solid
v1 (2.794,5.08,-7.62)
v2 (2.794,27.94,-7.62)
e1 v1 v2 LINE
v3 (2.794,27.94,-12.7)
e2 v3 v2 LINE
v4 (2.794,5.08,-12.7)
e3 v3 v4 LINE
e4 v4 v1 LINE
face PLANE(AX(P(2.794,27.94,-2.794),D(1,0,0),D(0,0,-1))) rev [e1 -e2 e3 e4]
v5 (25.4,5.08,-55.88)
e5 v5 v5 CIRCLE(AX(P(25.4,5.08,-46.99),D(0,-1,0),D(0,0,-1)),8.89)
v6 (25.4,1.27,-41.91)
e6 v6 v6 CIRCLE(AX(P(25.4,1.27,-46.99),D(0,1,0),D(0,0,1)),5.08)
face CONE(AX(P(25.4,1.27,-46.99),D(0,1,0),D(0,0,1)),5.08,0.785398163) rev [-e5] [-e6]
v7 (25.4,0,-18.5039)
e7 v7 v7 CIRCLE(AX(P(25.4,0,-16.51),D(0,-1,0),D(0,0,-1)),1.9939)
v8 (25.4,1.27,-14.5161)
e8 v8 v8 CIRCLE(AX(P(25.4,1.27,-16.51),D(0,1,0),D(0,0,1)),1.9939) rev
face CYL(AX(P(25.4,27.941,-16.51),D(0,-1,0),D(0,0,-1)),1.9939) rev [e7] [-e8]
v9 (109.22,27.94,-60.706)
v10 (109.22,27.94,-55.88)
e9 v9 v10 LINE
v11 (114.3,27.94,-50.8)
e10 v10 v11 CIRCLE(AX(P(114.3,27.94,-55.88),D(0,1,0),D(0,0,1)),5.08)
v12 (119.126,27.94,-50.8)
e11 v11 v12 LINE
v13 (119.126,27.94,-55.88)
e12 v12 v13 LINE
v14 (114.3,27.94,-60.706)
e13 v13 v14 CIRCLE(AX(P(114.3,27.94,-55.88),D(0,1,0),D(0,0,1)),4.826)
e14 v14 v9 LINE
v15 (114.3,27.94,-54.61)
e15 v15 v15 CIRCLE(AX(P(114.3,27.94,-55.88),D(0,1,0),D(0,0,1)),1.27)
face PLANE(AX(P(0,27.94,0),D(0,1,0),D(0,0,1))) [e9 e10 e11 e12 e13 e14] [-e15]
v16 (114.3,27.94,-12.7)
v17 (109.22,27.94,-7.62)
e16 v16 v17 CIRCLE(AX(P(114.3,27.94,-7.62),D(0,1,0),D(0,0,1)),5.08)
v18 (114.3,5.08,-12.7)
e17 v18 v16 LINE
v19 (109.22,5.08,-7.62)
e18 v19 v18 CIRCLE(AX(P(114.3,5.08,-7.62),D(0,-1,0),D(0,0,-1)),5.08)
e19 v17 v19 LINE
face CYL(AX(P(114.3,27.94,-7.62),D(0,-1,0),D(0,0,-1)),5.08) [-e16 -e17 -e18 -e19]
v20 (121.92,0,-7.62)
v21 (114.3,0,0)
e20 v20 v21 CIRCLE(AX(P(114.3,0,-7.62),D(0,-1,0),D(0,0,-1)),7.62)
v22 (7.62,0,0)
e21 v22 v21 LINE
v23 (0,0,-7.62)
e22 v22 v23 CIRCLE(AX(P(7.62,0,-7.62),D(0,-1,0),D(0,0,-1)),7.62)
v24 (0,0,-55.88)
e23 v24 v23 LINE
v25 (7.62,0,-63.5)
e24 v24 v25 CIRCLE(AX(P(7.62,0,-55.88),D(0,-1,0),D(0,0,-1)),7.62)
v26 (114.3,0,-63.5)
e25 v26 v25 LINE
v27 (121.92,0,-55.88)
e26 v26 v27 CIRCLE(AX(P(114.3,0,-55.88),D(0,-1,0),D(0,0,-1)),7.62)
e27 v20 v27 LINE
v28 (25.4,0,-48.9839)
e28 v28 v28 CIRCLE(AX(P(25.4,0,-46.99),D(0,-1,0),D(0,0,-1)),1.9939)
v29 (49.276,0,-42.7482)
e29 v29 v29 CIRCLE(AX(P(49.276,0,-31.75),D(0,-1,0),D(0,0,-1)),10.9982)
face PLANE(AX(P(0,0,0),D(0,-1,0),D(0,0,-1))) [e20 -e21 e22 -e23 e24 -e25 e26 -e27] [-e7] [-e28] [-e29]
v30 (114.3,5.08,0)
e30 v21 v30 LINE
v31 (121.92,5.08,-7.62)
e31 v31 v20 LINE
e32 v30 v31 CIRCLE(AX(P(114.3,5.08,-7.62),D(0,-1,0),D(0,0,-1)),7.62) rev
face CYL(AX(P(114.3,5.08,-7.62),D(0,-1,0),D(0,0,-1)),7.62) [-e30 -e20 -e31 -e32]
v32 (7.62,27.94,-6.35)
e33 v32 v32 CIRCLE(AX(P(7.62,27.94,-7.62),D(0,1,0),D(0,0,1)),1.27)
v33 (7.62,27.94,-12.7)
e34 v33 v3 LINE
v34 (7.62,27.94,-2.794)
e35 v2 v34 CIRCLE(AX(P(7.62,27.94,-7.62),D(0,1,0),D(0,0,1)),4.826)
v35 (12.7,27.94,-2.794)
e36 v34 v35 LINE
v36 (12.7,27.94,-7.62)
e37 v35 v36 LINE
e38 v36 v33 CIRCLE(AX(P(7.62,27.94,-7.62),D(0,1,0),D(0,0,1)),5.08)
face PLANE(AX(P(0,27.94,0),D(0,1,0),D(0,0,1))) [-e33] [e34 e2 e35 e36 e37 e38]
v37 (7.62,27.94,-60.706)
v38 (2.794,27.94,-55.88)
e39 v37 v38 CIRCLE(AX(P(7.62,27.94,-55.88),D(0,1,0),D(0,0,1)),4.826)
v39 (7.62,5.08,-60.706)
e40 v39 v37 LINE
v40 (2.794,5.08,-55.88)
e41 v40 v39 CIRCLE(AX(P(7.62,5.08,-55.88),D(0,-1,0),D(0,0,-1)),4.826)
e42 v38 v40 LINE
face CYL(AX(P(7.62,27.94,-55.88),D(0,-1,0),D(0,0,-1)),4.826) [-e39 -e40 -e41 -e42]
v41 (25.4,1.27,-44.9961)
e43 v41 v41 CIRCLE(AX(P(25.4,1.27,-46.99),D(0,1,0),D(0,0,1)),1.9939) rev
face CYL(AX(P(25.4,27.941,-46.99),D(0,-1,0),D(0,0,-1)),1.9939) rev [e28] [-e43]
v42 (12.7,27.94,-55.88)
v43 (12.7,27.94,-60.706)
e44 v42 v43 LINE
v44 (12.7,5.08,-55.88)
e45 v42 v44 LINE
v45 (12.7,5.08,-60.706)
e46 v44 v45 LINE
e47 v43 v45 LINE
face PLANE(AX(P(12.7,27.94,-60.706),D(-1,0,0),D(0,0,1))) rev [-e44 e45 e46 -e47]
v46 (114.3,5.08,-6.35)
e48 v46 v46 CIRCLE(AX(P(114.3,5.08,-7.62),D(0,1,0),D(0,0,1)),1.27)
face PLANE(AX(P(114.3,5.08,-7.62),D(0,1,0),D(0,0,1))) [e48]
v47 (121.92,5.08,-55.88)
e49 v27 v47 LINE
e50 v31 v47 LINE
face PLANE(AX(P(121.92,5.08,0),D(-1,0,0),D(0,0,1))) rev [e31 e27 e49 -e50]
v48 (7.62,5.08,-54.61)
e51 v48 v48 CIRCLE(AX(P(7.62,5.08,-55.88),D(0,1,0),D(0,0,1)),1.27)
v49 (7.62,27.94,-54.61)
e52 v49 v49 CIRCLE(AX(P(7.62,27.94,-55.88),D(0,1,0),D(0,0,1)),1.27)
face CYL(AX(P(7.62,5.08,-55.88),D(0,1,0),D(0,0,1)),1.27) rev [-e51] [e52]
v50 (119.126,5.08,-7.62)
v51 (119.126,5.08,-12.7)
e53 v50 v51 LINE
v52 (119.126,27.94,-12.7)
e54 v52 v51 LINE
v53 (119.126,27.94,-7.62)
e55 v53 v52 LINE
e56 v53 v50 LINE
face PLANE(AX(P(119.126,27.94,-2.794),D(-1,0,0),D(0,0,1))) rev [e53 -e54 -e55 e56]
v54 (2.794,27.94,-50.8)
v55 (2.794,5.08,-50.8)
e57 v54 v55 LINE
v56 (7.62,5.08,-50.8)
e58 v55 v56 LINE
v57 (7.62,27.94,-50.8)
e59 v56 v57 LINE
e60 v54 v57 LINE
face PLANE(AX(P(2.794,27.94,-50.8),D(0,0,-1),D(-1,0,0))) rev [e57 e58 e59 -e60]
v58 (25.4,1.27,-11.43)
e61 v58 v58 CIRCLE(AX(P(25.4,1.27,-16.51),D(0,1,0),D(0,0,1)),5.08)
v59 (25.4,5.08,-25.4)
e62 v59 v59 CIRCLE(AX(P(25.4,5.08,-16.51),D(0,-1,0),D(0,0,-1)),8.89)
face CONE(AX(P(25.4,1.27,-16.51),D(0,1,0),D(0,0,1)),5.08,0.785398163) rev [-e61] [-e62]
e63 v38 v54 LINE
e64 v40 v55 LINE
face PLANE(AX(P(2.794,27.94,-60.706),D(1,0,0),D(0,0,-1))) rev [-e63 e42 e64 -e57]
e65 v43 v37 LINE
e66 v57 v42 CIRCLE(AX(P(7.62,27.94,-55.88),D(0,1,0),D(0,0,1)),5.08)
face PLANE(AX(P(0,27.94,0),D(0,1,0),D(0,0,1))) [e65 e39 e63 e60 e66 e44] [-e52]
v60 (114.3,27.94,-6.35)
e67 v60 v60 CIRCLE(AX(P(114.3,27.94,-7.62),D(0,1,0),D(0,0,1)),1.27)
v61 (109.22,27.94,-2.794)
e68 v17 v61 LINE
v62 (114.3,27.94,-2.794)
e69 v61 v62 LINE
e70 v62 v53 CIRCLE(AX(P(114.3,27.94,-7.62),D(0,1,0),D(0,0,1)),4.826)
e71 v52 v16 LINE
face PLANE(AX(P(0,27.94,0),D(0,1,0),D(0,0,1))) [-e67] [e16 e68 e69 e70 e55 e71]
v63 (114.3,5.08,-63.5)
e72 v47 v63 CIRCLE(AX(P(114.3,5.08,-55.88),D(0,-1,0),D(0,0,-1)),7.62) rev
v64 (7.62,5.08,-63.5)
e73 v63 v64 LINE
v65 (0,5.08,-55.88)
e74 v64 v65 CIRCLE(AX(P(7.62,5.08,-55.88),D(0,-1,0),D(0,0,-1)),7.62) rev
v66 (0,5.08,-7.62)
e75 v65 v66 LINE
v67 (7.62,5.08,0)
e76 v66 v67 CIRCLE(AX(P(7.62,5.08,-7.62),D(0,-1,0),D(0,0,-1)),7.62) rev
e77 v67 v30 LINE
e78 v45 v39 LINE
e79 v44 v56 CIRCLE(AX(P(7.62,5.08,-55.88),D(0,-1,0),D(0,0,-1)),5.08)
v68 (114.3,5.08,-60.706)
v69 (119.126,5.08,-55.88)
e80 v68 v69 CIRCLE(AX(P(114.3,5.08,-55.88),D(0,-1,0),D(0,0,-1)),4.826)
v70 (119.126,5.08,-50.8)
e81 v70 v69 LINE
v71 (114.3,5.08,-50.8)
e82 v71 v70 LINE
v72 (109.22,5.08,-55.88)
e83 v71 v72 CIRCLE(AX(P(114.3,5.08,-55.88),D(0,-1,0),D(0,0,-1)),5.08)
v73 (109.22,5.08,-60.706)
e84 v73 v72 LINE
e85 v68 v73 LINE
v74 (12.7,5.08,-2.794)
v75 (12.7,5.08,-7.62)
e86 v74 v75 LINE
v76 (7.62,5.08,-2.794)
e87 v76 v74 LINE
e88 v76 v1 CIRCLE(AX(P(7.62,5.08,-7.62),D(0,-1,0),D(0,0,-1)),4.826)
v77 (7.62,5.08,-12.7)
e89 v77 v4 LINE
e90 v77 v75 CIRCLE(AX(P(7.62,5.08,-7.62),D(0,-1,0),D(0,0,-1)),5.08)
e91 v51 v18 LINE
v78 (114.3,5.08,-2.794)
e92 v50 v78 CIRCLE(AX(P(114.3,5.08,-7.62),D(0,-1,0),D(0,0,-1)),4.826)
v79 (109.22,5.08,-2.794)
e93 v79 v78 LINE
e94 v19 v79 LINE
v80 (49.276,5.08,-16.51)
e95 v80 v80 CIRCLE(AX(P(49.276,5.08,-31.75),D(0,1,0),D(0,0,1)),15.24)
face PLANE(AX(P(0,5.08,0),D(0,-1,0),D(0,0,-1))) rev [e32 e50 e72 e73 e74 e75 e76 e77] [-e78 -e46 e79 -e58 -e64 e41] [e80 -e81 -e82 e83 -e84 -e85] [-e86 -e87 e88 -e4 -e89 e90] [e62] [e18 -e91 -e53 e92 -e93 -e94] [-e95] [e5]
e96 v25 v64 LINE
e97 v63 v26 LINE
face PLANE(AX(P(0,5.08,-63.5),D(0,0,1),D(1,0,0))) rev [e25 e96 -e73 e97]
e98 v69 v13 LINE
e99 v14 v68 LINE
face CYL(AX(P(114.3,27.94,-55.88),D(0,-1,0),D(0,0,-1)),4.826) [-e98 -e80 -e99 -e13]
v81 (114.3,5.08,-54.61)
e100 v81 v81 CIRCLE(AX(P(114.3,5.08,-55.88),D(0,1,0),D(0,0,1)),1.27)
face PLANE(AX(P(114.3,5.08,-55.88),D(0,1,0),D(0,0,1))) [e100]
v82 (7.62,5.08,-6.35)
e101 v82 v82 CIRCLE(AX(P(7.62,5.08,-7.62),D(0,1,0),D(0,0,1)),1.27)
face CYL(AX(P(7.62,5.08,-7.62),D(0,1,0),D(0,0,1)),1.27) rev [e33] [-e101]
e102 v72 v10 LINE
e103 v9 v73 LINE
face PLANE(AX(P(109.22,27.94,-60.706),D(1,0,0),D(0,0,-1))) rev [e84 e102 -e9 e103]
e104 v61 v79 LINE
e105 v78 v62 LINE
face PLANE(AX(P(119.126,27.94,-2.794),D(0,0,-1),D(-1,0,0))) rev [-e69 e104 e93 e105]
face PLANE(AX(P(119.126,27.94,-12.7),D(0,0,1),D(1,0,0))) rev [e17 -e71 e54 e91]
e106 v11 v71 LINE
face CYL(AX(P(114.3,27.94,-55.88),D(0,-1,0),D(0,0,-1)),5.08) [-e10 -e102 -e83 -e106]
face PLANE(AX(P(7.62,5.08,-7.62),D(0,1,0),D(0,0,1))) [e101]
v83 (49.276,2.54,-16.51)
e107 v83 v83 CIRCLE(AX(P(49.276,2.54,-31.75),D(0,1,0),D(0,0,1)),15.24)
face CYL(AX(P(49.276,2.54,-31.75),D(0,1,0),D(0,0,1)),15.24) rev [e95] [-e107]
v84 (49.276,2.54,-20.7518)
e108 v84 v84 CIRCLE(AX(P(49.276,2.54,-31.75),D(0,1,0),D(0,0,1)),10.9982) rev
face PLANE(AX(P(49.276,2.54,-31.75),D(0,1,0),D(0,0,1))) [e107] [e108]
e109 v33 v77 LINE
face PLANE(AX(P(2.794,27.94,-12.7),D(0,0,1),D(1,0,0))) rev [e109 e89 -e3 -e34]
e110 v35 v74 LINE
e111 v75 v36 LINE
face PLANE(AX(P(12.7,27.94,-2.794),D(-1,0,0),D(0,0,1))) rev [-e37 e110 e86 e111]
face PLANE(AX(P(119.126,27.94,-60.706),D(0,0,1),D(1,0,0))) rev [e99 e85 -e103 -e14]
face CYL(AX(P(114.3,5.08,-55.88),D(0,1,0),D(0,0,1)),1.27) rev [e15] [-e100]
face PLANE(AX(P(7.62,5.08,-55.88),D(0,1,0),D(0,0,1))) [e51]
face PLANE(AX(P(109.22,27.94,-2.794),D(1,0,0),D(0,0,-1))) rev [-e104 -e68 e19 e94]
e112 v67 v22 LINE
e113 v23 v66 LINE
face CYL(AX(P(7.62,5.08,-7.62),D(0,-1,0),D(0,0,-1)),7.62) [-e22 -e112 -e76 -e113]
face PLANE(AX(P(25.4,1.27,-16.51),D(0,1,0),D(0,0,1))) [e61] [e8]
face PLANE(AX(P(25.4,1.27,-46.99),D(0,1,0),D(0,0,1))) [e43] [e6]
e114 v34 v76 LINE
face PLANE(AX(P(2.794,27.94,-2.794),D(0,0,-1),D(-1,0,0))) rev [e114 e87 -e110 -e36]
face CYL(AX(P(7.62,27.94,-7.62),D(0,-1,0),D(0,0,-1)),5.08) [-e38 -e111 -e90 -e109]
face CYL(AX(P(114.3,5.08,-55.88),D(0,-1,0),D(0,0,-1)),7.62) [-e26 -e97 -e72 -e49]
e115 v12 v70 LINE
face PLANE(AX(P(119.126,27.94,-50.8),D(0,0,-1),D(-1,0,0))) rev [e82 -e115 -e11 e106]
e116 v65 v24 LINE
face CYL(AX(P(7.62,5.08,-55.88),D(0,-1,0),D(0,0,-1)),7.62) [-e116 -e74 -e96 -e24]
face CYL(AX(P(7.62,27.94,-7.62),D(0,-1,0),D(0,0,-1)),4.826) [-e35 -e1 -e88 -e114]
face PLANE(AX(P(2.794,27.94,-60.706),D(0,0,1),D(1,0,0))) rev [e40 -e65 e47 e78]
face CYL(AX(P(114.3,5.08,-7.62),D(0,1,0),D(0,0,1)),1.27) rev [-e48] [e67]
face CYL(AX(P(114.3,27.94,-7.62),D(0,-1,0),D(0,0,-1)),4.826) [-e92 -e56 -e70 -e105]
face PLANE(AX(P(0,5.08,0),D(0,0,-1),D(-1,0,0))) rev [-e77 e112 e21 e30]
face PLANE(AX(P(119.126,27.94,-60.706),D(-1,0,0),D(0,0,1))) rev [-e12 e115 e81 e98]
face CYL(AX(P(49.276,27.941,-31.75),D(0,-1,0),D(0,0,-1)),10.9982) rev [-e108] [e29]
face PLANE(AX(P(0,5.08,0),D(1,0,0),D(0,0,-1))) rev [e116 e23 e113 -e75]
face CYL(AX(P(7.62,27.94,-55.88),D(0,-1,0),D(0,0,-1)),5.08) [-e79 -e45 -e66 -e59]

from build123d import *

# Parameters (mm, degrees)
SKETCH1_W           = 121.92
SKETCH1_H           = 63.5
BOSS_EXTRUDE1_DEPTH = 5.08
FILLET1_R           = 7.62
SKETCH2_W           = 9.906
SKETCH2_H           = 9.906
BOSS_EXTRUDE2_DEPTH = 22.86
FILLET2_R           = 4.826
FILLET3_R           = 5.08
SKETCH3_R           = 1.27
CUT_EXTRUDE1_DEPTH  = 22.86
CUT_EXTRUDE2_REACH  = 142.276
SKETCH5_R           = 10.9982
CUT_EXTRUDE3_REACH  = 142.276
SKETCH6_R           = 1.9939
SKETCH7_R           = 5.08
CUT_EXTRUDE4_DEPTH  = 3.81
CHAMFER1_SIZE       = 3.81
SKETCH8_R           = 15.24
CUT_EXTRUDE5_DEPTH  = 2.54


with BuildPart() as part:
    # Sketch1 → Boss-Extrude1 (new body)
    with BuildSketch(Plane(origin=(0, 0, 0), x_dir=(1, 0, 0), z_dir=(0, 1, 0))):
        with Locations((60.96, 31.75)):
            Rectangle(SKETCH1_W, SKETCH1_H)
    extrude(amount=BOSS_EXTRUDE1_DEPTH)

    # Fillet1
    fillet1_edges = [part.edges().sort_by_distance(p)[0] for p in [
        (0, 2.54, -63.5),
        (121.92, 2.54, -63.5),
        (121.92, 2.54, 0),
        (0, 2.54, 0),
    ]]
    fillet(fillet1_edges, radius=FILLET1_R)

    # Sketch2 → Boss-Extrude2 (add)
    with BuildSketch(Plane(origin=(0, 5.08, 0), x_dir=(1, 0, 0), z_dir=(0, 1, 0))):
        with Locations((7.747, 55.753)):
            Rectangle(SKETCH2_W, SKETCH2_H)
        with Locations((114.173, 55.753)):
            Rectangle(SKETCH2_W, SKETCH2_H)
        with Locations((114.173, 7.747)):
            Rectangle(SKETCH2_W, SKETCH2_H)
        with Locations((7.747, 7.747)):
            Rectangle(SKETCH2_W, SKETCH2_H)
    extrude(amount=BOSS_EXTRUDE2_DEPTH)

    # Fillet2
    fillet2_edges = [part.edges().sort_by_distance(p)[0] for p in [
        (2.794, 16.51, -60.706),
        (119.126, 16.51, -60.706),
        (119.126, 16.51, -2.794),
        (2.794, 16.51, -2.794),
    ]]
    fillet(fillet2_edges, radius=FILLET2_R)

    # Fillet3
    fillet3_edges = [part.edges().sort_by_distance(p)[0] for p in [
        (12.7, 16.51, -50.8),
        (109.22, 16.51, -50.8),
        (109.22, 16.51, -12.7),
        (12.7, 16.51, -12.7),
    ]]
    fillet(fillet3_edges, radius=FILLET3_R)

    # Sketch3 → Cut-Extrude1 (cut)
    with BuildSketch(Plane(origin=(0, 27.94, 0), x_dir=(1, 0, 0), z_dir=(0, 1, 0))):
        with Locations(Location((7.62, 55.88, 0), (0, 0, 270))):
            Circle(SKETCH3_R)
        with Locations(Location((114.3, 55.88, 0), (0, 0, 270))):
            Circle(SKETCH3_R)
        with Locations(Location((114.3, 7.62, 0), (0, 0, 270))):
            Circle(SKETCH3_R)
        with Locations(Location((7.62, 7.62, 0), (0, 0, 270))):
            Circle(SKETCH3_R)
    extrude(amount=-CUT_EXTRUDE1_DEPTH, mode=Mode.SUBTRACT)

    # Sketch5 → Cut-Extrude2 (cut, up to next)
    with BuildSketch(Plane.XZ, mode=Mode.PRIVATE) as cut_extrude2_sk1:
        with Locations(Location((49.276, -31.75, 0), (0, 0, 270))):
            Circle(SKETCH5_R)
    cut_extrude2_tool1 = extrude(cut_extrude2_sk1.sketch, amount=-CUT_EXTRUDE2_REACH, mode=Mode.PRIVATE) & part.part
    add(cut_extrude2_tool1.solids().sort_by_distance((49.276, 0, -31.75))[0], mode=Mode.SUBTRACT)

    # Sketch6 → Cut-Extrude3 (cut, up to next)
    with BuildSketch(Plane.XZ, mode=Mode.PRIVATE) as cut_extrude3_sk1:
        with Locations(Location((25.4, -16.51, 0), (0, 0, 270))):
            Circle(SKETCH6_R)
    cut_extrude3_tool1 = extrude(cut_extrude3_sk1.sketch, amount=-CUT_EXTRUDE3_REACH, mode=Mode.PRIVATE) & part.part
    # Sketch6 → Cut-Extrude3 (cut, up to next)
    with BuildSketch(Plane.XZ, mode=Mode.PRIVATE) as cut_extrude3_sk2:
        with Locations(Location((25.4, -46.99, 0), (0, 0, 270))):
            Circle(SKETCH6_R)
    cut_extrude3_tool2 = extrude(cut_extrude3_sk2.sketch, amount=-CUT_EXTRUDE3_REACH, mode=Mode.PRIVATE) & part.part
    add(cut_extrude3_tool1.solids().sort_by_distance((25.4, 0, -16.51))[0], mode=Mode.SUBTRACT)
    add(cut_extrude3_tool2.solids().sort_by_distance((25.4, 0, -46.99))[0], mode=Mode.SUBTRACT)

    # Sketch7 → Cut-Extrude4 (cut)
    with BuildSketch(Plane(origin=(0, 5.08, 0), x_dir=(1, 0, 0), z_dir=(0, 1, 0))):
        with Locations(Location((25.4, 46.99, 0), (0, 0, 270))):
            Circle(SKETCH7_R)
        with Locations(Location((25.4, 16.51, 0), (0, 0, 270))):
            Circle(SKETCH7_R)
    extrude(amount=-CUT_EXTRUDE4_DEPTH, mode=Mode.SUBTRACT)

    # Chamfer1
    chamfer1_edges = [part.edges().sort_by_distance(p)[0] for p in [
        (25.4, 5.08, -52.07),
        (25.4, 5.08, -21.59),
    ]]
    chamfer(chamfer1_edges, length=CHAMFER1_SIZE - 0.0001)  # a hair under: the kernel refuses the full size

    # Sketch8 → Cut-Extrude5 (cut)
    with BuildSketch(Plane(origin=(0, 5.08, 0), x_dir=(1, 0, 0), z_dir=(0, 1, 0))):
        with Locations(Location((49.276, 31.75, 0), (0, 0, 270))):
            Circle(SKETCH8_R)
    extrude(amount=-CUT_EXTRUDE5_DEPTH, mode=Mode.SUBTRACT)


solid = part.part
